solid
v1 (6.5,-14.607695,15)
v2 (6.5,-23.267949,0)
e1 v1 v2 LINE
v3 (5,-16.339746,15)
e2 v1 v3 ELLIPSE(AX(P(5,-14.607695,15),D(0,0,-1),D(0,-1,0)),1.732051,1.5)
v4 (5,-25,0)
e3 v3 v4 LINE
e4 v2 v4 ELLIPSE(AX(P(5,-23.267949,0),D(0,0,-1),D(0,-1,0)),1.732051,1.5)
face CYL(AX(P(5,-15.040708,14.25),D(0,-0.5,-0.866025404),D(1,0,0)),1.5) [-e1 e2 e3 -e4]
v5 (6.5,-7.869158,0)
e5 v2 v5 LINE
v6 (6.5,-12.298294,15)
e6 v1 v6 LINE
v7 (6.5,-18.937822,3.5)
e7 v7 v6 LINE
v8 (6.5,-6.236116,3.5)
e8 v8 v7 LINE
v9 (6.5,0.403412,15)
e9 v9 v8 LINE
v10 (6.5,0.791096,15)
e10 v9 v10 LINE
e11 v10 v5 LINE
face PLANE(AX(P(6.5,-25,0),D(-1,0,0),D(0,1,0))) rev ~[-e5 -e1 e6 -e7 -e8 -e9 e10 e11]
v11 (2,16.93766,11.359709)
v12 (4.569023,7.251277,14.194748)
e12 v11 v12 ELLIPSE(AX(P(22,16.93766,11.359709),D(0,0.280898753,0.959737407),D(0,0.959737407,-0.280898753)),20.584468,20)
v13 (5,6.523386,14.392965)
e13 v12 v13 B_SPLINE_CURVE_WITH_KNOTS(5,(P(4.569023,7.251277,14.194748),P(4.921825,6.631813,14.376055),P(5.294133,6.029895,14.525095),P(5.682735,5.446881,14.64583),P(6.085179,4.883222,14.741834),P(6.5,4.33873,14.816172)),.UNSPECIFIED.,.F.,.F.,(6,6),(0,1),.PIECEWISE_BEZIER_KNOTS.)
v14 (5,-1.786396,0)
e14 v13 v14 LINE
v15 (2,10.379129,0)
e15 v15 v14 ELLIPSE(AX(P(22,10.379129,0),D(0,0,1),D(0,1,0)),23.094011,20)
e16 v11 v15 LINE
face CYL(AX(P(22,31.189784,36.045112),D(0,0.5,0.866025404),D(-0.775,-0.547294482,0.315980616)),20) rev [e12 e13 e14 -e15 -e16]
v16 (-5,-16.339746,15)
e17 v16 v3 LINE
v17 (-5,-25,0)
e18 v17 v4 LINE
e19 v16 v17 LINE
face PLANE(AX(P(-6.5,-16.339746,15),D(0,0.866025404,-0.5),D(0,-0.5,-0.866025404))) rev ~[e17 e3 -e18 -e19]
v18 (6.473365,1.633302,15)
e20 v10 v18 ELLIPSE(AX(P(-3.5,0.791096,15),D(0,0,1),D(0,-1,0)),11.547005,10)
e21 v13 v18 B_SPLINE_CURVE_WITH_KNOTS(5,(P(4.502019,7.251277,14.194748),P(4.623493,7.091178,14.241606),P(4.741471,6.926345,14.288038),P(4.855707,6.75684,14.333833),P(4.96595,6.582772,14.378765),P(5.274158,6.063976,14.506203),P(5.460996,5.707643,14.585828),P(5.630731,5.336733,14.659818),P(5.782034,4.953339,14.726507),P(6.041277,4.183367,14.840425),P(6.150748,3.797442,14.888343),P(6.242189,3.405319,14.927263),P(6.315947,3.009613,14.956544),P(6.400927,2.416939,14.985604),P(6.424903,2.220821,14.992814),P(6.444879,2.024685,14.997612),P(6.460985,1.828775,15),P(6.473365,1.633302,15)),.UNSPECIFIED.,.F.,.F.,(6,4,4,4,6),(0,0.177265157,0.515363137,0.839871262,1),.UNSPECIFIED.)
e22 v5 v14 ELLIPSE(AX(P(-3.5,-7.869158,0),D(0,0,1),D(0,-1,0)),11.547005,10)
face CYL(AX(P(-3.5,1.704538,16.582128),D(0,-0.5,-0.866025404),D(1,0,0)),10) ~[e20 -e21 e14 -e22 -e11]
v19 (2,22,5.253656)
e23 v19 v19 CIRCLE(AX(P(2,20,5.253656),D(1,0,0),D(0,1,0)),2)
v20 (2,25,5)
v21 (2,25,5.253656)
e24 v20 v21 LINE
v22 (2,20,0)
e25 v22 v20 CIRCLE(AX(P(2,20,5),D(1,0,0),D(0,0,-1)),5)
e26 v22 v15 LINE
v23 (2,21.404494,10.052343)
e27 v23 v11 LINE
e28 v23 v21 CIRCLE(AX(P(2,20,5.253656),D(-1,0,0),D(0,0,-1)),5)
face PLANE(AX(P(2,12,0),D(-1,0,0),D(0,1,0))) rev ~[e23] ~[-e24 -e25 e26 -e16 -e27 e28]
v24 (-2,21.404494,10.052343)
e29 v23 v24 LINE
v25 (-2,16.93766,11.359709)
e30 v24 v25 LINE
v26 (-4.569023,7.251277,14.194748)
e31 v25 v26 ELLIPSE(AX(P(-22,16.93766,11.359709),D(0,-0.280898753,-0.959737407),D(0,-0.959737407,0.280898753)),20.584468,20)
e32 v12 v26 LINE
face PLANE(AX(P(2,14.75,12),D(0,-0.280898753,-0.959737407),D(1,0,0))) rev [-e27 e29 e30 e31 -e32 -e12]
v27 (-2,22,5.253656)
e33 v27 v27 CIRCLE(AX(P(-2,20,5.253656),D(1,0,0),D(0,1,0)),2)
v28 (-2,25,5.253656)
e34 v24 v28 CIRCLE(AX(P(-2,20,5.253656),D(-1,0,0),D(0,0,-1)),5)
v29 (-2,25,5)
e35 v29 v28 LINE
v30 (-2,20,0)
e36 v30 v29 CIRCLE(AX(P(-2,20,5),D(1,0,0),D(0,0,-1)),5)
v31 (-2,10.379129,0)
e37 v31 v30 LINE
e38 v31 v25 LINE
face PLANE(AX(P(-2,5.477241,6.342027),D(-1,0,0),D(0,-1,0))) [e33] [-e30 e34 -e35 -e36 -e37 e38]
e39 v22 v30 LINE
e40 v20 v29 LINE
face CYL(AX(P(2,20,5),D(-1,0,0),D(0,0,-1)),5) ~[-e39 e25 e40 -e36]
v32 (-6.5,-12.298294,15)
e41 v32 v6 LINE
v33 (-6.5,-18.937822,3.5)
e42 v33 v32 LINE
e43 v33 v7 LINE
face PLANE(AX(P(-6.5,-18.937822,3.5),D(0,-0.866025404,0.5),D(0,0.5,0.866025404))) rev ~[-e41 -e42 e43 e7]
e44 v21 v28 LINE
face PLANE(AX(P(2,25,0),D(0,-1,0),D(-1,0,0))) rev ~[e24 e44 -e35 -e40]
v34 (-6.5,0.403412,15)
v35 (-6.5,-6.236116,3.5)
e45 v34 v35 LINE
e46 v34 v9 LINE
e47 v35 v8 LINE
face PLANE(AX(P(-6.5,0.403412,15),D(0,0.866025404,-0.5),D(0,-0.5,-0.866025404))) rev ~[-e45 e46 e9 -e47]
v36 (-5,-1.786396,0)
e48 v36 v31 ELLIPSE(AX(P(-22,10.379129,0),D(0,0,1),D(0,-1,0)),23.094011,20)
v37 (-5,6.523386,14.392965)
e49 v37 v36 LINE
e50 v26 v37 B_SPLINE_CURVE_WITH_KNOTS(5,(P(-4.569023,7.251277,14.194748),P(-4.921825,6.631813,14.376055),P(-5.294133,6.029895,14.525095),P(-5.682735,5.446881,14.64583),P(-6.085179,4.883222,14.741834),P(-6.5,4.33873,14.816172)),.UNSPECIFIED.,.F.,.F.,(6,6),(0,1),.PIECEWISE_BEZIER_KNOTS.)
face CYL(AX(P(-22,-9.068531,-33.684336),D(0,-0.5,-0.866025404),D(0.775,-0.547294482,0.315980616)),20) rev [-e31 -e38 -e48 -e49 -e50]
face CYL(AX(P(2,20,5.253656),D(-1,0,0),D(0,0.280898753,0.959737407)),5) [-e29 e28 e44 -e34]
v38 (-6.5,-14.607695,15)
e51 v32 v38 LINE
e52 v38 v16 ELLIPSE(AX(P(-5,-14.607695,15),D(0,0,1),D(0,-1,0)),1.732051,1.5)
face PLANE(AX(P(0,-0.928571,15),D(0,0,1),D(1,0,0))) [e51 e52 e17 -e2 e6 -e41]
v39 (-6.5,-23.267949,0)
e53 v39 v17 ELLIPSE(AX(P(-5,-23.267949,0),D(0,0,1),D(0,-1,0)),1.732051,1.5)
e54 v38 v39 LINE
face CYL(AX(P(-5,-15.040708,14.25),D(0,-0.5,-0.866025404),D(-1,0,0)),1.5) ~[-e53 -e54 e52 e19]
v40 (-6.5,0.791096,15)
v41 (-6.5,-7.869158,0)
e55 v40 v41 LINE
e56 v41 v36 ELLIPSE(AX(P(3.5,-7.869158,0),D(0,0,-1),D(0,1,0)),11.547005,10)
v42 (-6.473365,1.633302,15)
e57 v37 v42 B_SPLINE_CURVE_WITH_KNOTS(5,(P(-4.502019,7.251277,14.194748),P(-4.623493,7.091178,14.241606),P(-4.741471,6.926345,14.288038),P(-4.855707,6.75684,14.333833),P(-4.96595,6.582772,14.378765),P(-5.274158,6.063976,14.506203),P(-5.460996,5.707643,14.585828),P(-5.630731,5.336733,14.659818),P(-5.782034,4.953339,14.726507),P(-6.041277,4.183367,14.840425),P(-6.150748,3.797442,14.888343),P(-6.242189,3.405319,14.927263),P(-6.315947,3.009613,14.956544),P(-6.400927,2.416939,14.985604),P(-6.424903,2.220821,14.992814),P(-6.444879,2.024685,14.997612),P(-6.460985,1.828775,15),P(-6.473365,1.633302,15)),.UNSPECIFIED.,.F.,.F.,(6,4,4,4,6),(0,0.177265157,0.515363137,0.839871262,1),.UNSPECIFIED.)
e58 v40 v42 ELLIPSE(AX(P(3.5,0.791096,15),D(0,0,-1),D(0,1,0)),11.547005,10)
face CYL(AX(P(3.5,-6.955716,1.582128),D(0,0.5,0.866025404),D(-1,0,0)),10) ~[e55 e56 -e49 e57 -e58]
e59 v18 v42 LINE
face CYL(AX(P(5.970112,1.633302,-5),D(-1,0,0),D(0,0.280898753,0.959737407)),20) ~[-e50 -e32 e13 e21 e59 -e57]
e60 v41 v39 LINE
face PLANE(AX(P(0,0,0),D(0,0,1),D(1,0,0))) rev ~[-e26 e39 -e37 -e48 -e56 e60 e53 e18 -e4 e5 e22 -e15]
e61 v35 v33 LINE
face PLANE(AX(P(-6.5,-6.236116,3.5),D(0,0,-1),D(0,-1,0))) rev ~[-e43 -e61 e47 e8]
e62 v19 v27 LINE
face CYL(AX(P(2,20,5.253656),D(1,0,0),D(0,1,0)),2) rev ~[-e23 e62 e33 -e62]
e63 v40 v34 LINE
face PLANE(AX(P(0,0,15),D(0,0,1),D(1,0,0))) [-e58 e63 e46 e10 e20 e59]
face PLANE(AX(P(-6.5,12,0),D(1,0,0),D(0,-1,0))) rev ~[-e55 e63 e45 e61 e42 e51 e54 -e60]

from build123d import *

# Parameters (mm, degrees)
F1_DEPTH     = 15
F3_DEPTH     = 25
F4_DEPTH     = 4.5
F6_DEPTH     = 4.5
F7_T4_DEPTH  = 80.5166313745
F7_T10_DEPTH = 80.5166313745
F8_SIZE2     = 20.5
F8_SIZE      = 6
F9_R         = 1.5
F10_R        = 10
F11_R        = 20
F12_R        = 5
F13_R        = 2
F14_DEPTH    = 25


# Not quite as in the source:
# - a fillet or chamfer that OpenCascade refuses, or shapes differently, is made with other operations: its cross-section is extruded or revolved along the edge and cut away or added


with BuildPart() as f1:
    # F0 (on Top) → F1 (new body)
    with BuildSketch(Plane.XY):
        Polygon((-6.5, 12), (-6.5, -25), (6.5, -25), (6.5, 12), (2, 12), (2, 25), (-2, 25), (-2, 12), align=None)
    extrude(amount=F1_DEPTH)

    # F2 (on face) → F3 (cut)
    with BuildSketch(Plane(origin=(-6.5, 0, 0), x_dir=(0, -1, 0), z_dir=(-1, 0, 0))):
        Polygon((6.2361162513, 3.5), (18.9378221735, 3.5), (12.2982940778, 15), (-0.4034118443, 15), align=None)
        Polygon((25, 15), (16.3397459622, 15), (25, 0), align=None)
    extrude(amount=-F3_DEPTH, mode=Mode.SUBTRACT)

    # F2 (on face) → F4 (cut)
    with BuildSketch(Plane(origin=(-6.5, 0, 0), x_dir=(0, -1, 0), z_dir=(-1, 0, 0))):
        Polygon((4.2153903092, 0), (2.194664367, 3.5), (-4.4448637287, 15), (-12, 15), (-12, 0), align=None)
    extrude(amount=-F4_DEPTH, mode=Mode.SUBTRACT)

    # F5 (on face) → F6 (cut)
    with BuildSketch(Plane.YZ.offset(6.5)):
        Polygon((12, 15), (4.4448637287, 15), (-4.2153903092, 0), (12, 0), align=None)
    extrude(amount=-F6_DEPTH, mode=Mode.SUBTRACT)

    # F7: fillet of radius 20 on 2 edges, made by hand


with BuildPart() as f7_tool2:
    # F7_s3 → F7_t4 (new body)
    with BuildSketch(Plane(origin=(0, -16.852878402, -29.190041646), x_dir=(1, 0, 0), z_dir=(0, 0.5, 0.8660254038))):
        with BuildLine():
            ThreePointArc((-6.5, -3.6506350946), (-3.1585563186, 2.2803856327), (-2, 8.9885895652))
            Line((-2, 8.9885895652), (-2, -3.6506350946))
            Line((-2, -3.6506350946), (-6.5, -3.6506350946))
        make_face()
    extrude(amount=F7_T4_DEPTH)

    split(bisect_by=Plane.XY.offset(15), keep=Keep.BOTTOM)

    split(bisect_by=Plane.XY, keep=Keep.TOP)


with BuildPart() as f1_1:
    add(f1.part)

    # F7_t1: union F7_tool2
    add(f7_tool2.part)


with BuildPart() as f7_tool8:
    # F7_s9 → F7_t10 (new body)
    with BuildSketch(Plane(origin=(0, 23.4054372853, 40.5394065514), x_dir=(1, 0, 0), z_dir=(0, -0.5, -0.8660254038))):
        with BuildLine():
            ThreePointArc((6.5, 3.6506350946), (3.1585563186, -2.2803856327), (2, -8.9885895652))
            Line((2, -8.9885895652), (2, 3.6506350946))
            Line((2, 3.6506350946), (6.5, 3.6506350946))
        make_face()
    extrude(amount=F7_T10_DEPTH)

    split(bisect_by=Plane.XY, keep=Keep.TOP)

    split(bisect_by=Plane.XY.offset(15), keep=Keep.BOTTOM)


with BuildPart() as f1_2:
    add(f1_1.part)

    # F7_t7: union F7_tool8
    add(f7_tool8.part)

    # F8
    f8_edges = [f1_2.edges().sort_by_distance(p)[0] for p in [
        (0, 25, 15),
    ]]
    f8_side = f1_2.faces().sort_by_distance((0, 25, 7.5))[0]
    chamfer(f8_edges, length=F8_SIZE, length2=F8_SIZE2, reference=f8_side)

    # F9
    f9_edges = [f1_2.edges().sort_by_distance(p)[0] for p in [
        (-6.5, -20.669873, 7.5),
        (6.5, -20.669873, 7.5),
    ]]
    fillet(f9_edges, radius=F9_R)

    # F10
    f10_edges = [f1_2.edges().sort_by_distance(p)[0] for p in [
        (-6.5, 0.114737, 7.5),
        (6.5, 0.114737, 7.5),
    ]]
    fillet(f10_edges, radius=F10_R)

    # F11
    f11_edges = [f1_2.edges().sort_by_distance(p)[0] for p in [
        (0, 4.5, 15),
    ]]
    fillet(f11_edges, radius=F11_R)

    # F12
    f12_edges = [f1_2.edges().sort_by_distance(p)[0] for p in [
        (0, 25, 9),
        (0, 25, 0),
    ]]
    fillet(f12_edges, radius=F12_R)

    # F13 (on face) → F14 (cut)
    with BuildSketch(Plane.YZ.offset(2)):
        with Locations((20, 5.2536562529)):
            Circle(F13_R)
    extrude(amount=-F14_DEPTH, mode=Mode.SUBTRACT)


solid = f1_2.part
